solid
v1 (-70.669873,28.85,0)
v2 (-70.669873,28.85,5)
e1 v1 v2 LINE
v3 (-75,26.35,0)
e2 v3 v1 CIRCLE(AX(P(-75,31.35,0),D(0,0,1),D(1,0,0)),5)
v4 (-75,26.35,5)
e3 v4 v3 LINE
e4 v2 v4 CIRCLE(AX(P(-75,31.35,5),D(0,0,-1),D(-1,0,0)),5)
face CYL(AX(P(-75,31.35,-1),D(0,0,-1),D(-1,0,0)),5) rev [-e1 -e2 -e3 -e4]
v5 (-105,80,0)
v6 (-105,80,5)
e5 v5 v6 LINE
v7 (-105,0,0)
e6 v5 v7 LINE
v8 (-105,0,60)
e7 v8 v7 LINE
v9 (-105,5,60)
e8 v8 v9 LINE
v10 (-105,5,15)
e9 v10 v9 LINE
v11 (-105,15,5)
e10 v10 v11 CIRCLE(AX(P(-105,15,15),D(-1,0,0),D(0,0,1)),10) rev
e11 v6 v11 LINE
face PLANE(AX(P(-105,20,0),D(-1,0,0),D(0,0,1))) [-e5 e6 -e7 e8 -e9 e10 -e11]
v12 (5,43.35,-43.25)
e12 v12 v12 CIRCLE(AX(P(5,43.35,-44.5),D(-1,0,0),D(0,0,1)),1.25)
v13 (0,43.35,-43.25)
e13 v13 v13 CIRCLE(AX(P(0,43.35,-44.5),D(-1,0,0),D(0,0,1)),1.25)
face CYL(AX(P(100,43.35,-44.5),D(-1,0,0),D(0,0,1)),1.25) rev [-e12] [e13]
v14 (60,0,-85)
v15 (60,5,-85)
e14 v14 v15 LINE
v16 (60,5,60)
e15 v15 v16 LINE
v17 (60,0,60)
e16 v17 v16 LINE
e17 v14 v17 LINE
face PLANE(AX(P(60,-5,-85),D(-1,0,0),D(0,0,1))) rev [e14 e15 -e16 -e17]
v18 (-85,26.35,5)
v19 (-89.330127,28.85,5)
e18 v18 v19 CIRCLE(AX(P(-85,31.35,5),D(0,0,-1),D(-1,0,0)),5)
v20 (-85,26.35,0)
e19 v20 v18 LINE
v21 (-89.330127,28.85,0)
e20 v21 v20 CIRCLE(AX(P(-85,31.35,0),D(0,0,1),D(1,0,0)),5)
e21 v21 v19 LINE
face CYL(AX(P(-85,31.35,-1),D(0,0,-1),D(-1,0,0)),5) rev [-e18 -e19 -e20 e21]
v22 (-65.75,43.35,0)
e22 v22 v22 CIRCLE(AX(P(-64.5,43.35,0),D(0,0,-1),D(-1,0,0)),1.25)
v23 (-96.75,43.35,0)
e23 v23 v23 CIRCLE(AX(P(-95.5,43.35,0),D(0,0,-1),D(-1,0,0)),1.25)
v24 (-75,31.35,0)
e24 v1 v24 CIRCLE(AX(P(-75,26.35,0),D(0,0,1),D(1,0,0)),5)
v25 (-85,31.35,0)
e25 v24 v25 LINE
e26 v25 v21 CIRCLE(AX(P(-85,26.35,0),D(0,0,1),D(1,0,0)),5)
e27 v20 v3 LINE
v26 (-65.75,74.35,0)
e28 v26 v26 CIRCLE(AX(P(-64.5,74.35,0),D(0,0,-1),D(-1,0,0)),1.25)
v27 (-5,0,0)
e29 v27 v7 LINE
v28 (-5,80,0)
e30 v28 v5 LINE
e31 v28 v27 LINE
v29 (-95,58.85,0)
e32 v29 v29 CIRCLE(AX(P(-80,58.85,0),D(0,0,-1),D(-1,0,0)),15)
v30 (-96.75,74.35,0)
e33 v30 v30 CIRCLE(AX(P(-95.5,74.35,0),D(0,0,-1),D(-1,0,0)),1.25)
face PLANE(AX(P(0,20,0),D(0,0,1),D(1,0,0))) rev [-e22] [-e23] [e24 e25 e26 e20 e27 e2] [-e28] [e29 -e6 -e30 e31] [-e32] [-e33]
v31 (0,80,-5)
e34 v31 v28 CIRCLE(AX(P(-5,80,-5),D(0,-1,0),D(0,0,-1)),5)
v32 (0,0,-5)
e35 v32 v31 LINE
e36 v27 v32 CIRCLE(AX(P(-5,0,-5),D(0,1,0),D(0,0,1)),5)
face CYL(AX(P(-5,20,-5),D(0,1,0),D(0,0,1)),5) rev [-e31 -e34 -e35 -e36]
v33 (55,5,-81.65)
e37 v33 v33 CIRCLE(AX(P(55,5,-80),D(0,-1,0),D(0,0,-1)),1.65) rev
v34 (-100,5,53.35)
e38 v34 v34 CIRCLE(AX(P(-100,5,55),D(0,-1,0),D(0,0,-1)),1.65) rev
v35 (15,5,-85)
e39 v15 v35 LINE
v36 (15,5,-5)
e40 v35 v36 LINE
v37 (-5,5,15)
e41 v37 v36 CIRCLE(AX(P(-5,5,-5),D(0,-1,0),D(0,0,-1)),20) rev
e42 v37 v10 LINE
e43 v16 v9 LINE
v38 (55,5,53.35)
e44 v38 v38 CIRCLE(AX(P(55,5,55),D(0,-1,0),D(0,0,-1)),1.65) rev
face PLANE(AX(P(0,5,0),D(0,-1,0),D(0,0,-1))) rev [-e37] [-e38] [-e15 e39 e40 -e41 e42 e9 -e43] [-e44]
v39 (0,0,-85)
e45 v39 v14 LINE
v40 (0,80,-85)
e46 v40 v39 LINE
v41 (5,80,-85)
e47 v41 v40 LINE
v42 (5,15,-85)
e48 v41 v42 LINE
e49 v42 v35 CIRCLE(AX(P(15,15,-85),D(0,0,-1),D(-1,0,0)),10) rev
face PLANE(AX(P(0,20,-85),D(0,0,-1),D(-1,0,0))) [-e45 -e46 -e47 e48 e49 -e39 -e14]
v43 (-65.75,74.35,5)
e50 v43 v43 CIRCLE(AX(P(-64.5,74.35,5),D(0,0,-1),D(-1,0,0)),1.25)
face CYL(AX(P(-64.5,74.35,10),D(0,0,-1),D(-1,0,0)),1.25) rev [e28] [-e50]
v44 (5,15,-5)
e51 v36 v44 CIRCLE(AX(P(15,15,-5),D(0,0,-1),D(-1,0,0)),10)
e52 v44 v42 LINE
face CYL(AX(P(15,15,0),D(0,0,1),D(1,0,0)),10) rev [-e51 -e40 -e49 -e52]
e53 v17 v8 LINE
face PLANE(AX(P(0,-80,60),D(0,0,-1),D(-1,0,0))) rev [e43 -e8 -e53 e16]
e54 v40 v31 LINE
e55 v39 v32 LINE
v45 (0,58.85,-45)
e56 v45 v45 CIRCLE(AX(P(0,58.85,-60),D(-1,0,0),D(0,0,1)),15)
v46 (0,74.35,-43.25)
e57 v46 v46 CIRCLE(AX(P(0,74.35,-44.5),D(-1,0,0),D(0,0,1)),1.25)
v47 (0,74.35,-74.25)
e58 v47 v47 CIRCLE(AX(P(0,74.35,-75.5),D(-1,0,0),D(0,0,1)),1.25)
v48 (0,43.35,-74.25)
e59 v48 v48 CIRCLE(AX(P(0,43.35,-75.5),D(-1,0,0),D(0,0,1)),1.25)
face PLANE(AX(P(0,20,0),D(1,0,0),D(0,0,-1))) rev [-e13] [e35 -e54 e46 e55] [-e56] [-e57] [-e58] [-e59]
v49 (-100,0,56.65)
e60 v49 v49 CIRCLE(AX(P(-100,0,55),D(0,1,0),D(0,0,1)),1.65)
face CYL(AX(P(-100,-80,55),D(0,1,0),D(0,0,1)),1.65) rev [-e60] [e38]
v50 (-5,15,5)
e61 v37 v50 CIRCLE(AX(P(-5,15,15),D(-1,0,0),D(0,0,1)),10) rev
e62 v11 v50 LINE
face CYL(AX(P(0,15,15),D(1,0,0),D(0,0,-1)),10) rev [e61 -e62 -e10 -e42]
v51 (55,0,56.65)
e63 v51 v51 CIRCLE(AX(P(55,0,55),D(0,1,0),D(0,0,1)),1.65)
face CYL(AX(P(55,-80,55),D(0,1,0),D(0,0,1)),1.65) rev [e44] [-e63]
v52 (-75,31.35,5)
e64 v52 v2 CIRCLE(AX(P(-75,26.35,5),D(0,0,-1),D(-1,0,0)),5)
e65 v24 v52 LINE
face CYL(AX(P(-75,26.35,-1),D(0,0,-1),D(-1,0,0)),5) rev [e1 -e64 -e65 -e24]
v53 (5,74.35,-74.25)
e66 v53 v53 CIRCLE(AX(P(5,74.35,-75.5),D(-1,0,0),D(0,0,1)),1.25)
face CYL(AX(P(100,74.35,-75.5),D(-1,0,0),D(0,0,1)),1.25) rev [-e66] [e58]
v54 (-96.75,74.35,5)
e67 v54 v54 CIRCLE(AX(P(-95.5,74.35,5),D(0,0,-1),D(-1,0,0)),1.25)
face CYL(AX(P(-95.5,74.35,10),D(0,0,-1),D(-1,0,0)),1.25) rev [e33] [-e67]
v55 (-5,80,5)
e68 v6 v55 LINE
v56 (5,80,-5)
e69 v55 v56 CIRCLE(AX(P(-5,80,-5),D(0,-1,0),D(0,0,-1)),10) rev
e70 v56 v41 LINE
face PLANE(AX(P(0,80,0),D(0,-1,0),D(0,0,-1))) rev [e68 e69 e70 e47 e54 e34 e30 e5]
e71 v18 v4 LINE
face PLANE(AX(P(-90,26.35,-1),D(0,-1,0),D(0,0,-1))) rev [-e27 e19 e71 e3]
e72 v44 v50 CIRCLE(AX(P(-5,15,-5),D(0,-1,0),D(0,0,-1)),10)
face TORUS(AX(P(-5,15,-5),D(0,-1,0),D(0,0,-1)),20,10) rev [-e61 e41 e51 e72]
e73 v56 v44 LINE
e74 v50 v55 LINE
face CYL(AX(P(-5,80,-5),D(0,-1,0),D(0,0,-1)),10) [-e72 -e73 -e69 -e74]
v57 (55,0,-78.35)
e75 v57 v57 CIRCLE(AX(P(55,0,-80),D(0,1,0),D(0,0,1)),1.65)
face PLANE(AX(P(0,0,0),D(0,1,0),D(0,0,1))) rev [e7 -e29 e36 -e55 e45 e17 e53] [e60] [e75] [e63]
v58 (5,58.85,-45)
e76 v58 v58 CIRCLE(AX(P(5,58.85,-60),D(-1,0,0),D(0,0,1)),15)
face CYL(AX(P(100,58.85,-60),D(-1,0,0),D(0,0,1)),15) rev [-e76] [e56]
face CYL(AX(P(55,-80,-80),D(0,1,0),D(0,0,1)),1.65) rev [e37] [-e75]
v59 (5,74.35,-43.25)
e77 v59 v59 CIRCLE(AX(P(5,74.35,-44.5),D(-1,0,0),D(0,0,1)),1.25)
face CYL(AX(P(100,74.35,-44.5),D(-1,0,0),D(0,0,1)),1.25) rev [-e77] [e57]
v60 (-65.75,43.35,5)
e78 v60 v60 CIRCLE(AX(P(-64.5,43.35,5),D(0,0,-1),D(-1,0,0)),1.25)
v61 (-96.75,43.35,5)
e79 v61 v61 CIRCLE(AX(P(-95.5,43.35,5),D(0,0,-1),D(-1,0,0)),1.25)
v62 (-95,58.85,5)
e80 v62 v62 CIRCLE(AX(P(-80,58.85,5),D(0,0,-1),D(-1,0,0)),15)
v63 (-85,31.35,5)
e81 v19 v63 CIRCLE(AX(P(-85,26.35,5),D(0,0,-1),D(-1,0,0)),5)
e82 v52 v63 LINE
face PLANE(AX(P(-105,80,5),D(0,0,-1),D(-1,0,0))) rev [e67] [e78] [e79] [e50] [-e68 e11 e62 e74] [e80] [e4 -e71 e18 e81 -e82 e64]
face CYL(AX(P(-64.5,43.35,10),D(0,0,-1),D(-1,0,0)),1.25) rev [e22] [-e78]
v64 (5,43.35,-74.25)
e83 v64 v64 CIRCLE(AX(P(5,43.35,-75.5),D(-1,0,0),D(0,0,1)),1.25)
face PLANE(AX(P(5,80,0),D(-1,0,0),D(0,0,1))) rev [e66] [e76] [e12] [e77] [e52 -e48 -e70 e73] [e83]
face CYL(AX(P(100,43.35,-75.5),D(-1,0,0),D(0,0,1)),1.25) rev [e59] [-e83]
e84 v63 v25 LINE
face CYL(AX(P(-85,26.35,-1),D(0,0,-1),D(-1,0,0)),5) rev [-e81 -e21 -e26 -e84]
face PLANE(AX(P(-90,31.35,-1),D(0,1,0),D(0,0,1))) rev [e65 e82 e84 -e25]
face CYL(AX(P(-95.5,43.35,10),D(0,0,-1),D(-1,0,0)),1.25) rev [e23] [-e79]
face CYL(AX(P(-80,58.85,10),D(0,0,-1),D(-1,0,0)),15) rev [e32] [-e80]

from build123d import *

# Parameters (mm, degrees)
BOSS_EXTRUDE1_DEPTH = 20
SKETCH2_W           = 5
SKETCH2_H           = 85
BOSS_EXTRUDE2_DEPTH = 60
SKETCH3_R           = 15
CUT_EXTRUDE1_DEPTH  = 100
SKETCH4_R           = 1.25
CUT_EXTRUDE2_DEPTH  = 100
SKETCH7_W           = 110
SKETCH7_H           = 5
BOSS_EXTRUDE6_DEPTH = 60
FILLET3_R           = 5
SKETCH8_W           = 25
SKETCH8_H           = 145
SKETCH8_H_2         = 25
SKETCH8_W_2         = 185
CUT_EXTRUDE3_DEPTH  = 100
SKETCH9_R           = 1.65
CUT_EXTRUDE4_DEPTH  = 100
SKETCH10_W          = 75
SKETCH10_H          = 55
SKETCH10_W_2        = 110
SKETCH10_H_2        = 90
CUT_EXTRUDE5_DEPTH  = 15
FILLET4_R           = 10
SKETCH11_W          = 20
SKETCH11_H          = 5
CUT_EXTRUDE6_DEPTH  = 6
FILLET5_R           = 5
SKETCH12_R          = 15
SKETCH12_R_2        = 1.25
CUT_EXTRUDE7_DEPTH  = 10
SKETCH13_W          = 20
SKETCH13_H          = 145
CUT_EXTRUDE8_DEPTH  = 10


with BuildPart() as part:
    # Sketch1 → Boss-Extrude1 (new body)
    with BuildSketch(Plane(origin=(0, 0, 0), x_dir=(1, 0, 0), z_dir=(0, 1, 0))):
        Polygon((105, 85), (0, 85), (0, 0), (-105, 0), (-105, -85), (105, -85), align=None)
    extrude(amount=BOSS_EXTRUDE1_DEPTH)

    # Sketch2 → Boss-Extrude2 (add)
    with BuildSketch(Plane(origin=(0, 20, 0), x_dir=(1, 0, 0), z_dir=(0, 1, 0))):
        with Locations((2.5, 42.5)):
            Rectangle(SKETCH2_W, SKETCH2_H)
    extrude(amount=BOSS_EXTRUDE2_DEPTH)

    # Sketch3 → Cut-Extrude1 (cut)
    with BuildSketch(Plane.ZY):
        with Locations((-60, 58.85)):
            Circle(SKETCH3_R)
    extrude(amount=-CUT_EXTRUDE1_DEPTH, mode=Mode.SUBTRACT)

    # Sketch4 → Cut-Extrude2 (cut)
    with BuildSketch(Plane.ZY):
        with Locations((-75.5, 74.35)):
            Circle(SKETCH4_R)
        with Locations((-44.5, 74.35)):
            Circle(SKETCH4_R)
        with Locations((-75.5, 43.35)):
            Circle(SKETCH4_R)
        with Locations((-44.5, 43.35)):
            Circle(SKETCH4_R)
    extrude(amount=-CUT_EXTRUDE2_DEPTH, mode=Mode.SUBTRACT)

    # Sketch7 → Boss-Extrude6 (add)
    with BuildSketch(Plane(origin=(0, 20, 0), x_dir=(1, 0, 0), z_dir=(0, 1, 0))):
        with Locations((-50, -2.5)):
            Rectangle(SKETCH7_W, SKETCH7_H)
    extrude(amount=BOSS_EXTRUDE6_DEPTH)

    # Fillet3
    fillet3_edges = [part.edges().sort_by_distance(p)[0] for p in [
        (0, 40, 0),
    ]]
    fillet(fillet3_edges, radius=FILLET3_R)

    # Sketch8 → Cut-Extrude3 (cut)
    with BuildSketch(Plane(origin=(0, 20, 0), x_dir=(1, 0, 0), z_dir=(0, 1, 0))):
        with Locations((92.5, 12.5)):
            Rectangle(SKETCH8_W, SKETCH8_H)
        with Locations((92.5, -72.5)):
            Rectangle(SKETCH8_W, SKETCH8_H_2)
        with Locations((-12.5, -72.5)):
            Rectangle(SKETCH8_W_2, SKETCH8_H_2)
    extrude(amount=-CUT_EXTRUDE3_DEPTH, mode=Mode.SUBTRACT)

    # Sketch9 → Cut-Extrude4 (cut)
    with BuildSketch(Plane(origin=(0, 20, 0), x_dir=(1, 0, 0), z_dir=(0, 1, 0))):
        with Locations(Location((55, 80, 0), (0, 0, 270))):
            Circle(SKETCH9_R)
        with Locations(Location((55, -55, 0), (0, 0, 270))):
            Circle(SKETCH9_R)
        with Locations(Location((-100, -55, 0), (0, 0, 270))):
            Circle(SKETCH9_R)
    extrude(amount=-CUT_EXTRUDE4_DEPTH, mode=Mode.SUBTRACT)

    # Sketch10 → Cut-Extrude5 (cut)
    with BuildSketch(Plane(origin=(0, 20, 0), x_dir=(1, 0, 0), z_dir=(0, 1, 0))):
        with Locations((42.5, -32.5)):
            Rectangle(SKETCH10_W, SKETCH10_H)
        with Locations((-50, -32.5)):
            Rectangle(SKETCH10_W_2, SKETCH10_H)
        with Locations((42.5, 40)):
            Rectangle(SKETCH10_W, SKETCH10_H_2)
    extrude(amount=-CUT_EXTRUDE5_DEPTH, mode=Mode.SUBTRACT)

    # Fillet4
    fillet4_edges = [part.edges().sort_by_distance(p)[0] for p in [
        (5, 5, -40),
        (-50, 5, 5),
        (5, 42.5, 5),
    ]]
    fillet(fillet4_edges, radius=FILLET4_R)

    # Sketch11 → Cut-Extrude6 (cut)
    with BuildSketch(Plane.XY.offset(5)):
        with Locations((-80, 28.85)):
            Rectangle(SKETCH11_W, SKETCH11_H)
    extrude(amount=-CUT_EXTRUDE6_DEPTH, mode=Mode.SUBTRACT)

    # Fillet5
    # the kernel refuses this fillet: 5 mm, written as the material it adds along each edge
    with BuildSketch(Plane(origin=(-90, 26.35, 5), x_dir=(0, 1, 0), z_dir=(0, 0, -1))) as fillet5_piece_1:
        with BuildLine():
            CenterArc((FILLET5_R, FILLET5_R), FILLET5_R, 180, 90)
            Line((0, FILLET5_R), (0, 0))
            Line((0, 0), (FILLET5_R, 0))
        make_face()
    extrude(amount=5)
    with BuildSketch(Plane(origin=(-90, 31.35, 5), x_dir=(0, -1, 0), z_dir=(0, 0, -1)), Plane(origin=(-70, 31.35, 5), x_dir=(-1, 0, 0), z_dir=(0, 0, -1)), Plane(origin=(-70, 26.35, 5), x_dir=(0, 1, 0), z_dir=(0, 0, -1))) as fillet5_piece_2:
        with BuildLine():
            CenterArc((FILLET5_R, -FILLET5_R), FILLET5_R, 90, 90)
            Line((0, -FILLET5_R), (0, 0))
            Line((0, 0), (FILLET5_R, 0))
        make_face()
    extrude(amount=5)

    # Sketch12 → Cut-Extrude7 (cut)
    with BuildSketch(Plane(origin=(0, 0, 0), x_dir=(-1, 0, 0), z_dir=(0, 0, -1))):
        with Locations((80, 58.85)):
            Circle(SKETCH12_R)
        with Locations((95.5, 74.35)):
            Circle(SKETCH12_R_2)
        with Locations((64.5, 74.35)):
            Circle(SKETCH12_R_2)
        with Locations((64.5, 43.35)):
            Circle(SKETCH12_R_2)
        with Locations((95.5, 43.35)):
            Circle(SKETCH12_R_2)
    extrude(amount=-CUT_EXTRUDE7_DEPTH, mode=Mode.SUBTRACT)

    # Sketch13 → Cut-Extrude8 (cut)
    with BuildSketch(Plane(origin=(0, 5, 0), x_dir=(1, 0, 0), z_dir=(0, 1, 0))):
        with Locations((70, 12.5)):
            Rectangle(SKETCH13_W, SKETCH13_H)
    extrude(amount=-CUT_EXTRUDE8_DEPTH, mode=Mode.SUBTRACT)


solid = part.part
